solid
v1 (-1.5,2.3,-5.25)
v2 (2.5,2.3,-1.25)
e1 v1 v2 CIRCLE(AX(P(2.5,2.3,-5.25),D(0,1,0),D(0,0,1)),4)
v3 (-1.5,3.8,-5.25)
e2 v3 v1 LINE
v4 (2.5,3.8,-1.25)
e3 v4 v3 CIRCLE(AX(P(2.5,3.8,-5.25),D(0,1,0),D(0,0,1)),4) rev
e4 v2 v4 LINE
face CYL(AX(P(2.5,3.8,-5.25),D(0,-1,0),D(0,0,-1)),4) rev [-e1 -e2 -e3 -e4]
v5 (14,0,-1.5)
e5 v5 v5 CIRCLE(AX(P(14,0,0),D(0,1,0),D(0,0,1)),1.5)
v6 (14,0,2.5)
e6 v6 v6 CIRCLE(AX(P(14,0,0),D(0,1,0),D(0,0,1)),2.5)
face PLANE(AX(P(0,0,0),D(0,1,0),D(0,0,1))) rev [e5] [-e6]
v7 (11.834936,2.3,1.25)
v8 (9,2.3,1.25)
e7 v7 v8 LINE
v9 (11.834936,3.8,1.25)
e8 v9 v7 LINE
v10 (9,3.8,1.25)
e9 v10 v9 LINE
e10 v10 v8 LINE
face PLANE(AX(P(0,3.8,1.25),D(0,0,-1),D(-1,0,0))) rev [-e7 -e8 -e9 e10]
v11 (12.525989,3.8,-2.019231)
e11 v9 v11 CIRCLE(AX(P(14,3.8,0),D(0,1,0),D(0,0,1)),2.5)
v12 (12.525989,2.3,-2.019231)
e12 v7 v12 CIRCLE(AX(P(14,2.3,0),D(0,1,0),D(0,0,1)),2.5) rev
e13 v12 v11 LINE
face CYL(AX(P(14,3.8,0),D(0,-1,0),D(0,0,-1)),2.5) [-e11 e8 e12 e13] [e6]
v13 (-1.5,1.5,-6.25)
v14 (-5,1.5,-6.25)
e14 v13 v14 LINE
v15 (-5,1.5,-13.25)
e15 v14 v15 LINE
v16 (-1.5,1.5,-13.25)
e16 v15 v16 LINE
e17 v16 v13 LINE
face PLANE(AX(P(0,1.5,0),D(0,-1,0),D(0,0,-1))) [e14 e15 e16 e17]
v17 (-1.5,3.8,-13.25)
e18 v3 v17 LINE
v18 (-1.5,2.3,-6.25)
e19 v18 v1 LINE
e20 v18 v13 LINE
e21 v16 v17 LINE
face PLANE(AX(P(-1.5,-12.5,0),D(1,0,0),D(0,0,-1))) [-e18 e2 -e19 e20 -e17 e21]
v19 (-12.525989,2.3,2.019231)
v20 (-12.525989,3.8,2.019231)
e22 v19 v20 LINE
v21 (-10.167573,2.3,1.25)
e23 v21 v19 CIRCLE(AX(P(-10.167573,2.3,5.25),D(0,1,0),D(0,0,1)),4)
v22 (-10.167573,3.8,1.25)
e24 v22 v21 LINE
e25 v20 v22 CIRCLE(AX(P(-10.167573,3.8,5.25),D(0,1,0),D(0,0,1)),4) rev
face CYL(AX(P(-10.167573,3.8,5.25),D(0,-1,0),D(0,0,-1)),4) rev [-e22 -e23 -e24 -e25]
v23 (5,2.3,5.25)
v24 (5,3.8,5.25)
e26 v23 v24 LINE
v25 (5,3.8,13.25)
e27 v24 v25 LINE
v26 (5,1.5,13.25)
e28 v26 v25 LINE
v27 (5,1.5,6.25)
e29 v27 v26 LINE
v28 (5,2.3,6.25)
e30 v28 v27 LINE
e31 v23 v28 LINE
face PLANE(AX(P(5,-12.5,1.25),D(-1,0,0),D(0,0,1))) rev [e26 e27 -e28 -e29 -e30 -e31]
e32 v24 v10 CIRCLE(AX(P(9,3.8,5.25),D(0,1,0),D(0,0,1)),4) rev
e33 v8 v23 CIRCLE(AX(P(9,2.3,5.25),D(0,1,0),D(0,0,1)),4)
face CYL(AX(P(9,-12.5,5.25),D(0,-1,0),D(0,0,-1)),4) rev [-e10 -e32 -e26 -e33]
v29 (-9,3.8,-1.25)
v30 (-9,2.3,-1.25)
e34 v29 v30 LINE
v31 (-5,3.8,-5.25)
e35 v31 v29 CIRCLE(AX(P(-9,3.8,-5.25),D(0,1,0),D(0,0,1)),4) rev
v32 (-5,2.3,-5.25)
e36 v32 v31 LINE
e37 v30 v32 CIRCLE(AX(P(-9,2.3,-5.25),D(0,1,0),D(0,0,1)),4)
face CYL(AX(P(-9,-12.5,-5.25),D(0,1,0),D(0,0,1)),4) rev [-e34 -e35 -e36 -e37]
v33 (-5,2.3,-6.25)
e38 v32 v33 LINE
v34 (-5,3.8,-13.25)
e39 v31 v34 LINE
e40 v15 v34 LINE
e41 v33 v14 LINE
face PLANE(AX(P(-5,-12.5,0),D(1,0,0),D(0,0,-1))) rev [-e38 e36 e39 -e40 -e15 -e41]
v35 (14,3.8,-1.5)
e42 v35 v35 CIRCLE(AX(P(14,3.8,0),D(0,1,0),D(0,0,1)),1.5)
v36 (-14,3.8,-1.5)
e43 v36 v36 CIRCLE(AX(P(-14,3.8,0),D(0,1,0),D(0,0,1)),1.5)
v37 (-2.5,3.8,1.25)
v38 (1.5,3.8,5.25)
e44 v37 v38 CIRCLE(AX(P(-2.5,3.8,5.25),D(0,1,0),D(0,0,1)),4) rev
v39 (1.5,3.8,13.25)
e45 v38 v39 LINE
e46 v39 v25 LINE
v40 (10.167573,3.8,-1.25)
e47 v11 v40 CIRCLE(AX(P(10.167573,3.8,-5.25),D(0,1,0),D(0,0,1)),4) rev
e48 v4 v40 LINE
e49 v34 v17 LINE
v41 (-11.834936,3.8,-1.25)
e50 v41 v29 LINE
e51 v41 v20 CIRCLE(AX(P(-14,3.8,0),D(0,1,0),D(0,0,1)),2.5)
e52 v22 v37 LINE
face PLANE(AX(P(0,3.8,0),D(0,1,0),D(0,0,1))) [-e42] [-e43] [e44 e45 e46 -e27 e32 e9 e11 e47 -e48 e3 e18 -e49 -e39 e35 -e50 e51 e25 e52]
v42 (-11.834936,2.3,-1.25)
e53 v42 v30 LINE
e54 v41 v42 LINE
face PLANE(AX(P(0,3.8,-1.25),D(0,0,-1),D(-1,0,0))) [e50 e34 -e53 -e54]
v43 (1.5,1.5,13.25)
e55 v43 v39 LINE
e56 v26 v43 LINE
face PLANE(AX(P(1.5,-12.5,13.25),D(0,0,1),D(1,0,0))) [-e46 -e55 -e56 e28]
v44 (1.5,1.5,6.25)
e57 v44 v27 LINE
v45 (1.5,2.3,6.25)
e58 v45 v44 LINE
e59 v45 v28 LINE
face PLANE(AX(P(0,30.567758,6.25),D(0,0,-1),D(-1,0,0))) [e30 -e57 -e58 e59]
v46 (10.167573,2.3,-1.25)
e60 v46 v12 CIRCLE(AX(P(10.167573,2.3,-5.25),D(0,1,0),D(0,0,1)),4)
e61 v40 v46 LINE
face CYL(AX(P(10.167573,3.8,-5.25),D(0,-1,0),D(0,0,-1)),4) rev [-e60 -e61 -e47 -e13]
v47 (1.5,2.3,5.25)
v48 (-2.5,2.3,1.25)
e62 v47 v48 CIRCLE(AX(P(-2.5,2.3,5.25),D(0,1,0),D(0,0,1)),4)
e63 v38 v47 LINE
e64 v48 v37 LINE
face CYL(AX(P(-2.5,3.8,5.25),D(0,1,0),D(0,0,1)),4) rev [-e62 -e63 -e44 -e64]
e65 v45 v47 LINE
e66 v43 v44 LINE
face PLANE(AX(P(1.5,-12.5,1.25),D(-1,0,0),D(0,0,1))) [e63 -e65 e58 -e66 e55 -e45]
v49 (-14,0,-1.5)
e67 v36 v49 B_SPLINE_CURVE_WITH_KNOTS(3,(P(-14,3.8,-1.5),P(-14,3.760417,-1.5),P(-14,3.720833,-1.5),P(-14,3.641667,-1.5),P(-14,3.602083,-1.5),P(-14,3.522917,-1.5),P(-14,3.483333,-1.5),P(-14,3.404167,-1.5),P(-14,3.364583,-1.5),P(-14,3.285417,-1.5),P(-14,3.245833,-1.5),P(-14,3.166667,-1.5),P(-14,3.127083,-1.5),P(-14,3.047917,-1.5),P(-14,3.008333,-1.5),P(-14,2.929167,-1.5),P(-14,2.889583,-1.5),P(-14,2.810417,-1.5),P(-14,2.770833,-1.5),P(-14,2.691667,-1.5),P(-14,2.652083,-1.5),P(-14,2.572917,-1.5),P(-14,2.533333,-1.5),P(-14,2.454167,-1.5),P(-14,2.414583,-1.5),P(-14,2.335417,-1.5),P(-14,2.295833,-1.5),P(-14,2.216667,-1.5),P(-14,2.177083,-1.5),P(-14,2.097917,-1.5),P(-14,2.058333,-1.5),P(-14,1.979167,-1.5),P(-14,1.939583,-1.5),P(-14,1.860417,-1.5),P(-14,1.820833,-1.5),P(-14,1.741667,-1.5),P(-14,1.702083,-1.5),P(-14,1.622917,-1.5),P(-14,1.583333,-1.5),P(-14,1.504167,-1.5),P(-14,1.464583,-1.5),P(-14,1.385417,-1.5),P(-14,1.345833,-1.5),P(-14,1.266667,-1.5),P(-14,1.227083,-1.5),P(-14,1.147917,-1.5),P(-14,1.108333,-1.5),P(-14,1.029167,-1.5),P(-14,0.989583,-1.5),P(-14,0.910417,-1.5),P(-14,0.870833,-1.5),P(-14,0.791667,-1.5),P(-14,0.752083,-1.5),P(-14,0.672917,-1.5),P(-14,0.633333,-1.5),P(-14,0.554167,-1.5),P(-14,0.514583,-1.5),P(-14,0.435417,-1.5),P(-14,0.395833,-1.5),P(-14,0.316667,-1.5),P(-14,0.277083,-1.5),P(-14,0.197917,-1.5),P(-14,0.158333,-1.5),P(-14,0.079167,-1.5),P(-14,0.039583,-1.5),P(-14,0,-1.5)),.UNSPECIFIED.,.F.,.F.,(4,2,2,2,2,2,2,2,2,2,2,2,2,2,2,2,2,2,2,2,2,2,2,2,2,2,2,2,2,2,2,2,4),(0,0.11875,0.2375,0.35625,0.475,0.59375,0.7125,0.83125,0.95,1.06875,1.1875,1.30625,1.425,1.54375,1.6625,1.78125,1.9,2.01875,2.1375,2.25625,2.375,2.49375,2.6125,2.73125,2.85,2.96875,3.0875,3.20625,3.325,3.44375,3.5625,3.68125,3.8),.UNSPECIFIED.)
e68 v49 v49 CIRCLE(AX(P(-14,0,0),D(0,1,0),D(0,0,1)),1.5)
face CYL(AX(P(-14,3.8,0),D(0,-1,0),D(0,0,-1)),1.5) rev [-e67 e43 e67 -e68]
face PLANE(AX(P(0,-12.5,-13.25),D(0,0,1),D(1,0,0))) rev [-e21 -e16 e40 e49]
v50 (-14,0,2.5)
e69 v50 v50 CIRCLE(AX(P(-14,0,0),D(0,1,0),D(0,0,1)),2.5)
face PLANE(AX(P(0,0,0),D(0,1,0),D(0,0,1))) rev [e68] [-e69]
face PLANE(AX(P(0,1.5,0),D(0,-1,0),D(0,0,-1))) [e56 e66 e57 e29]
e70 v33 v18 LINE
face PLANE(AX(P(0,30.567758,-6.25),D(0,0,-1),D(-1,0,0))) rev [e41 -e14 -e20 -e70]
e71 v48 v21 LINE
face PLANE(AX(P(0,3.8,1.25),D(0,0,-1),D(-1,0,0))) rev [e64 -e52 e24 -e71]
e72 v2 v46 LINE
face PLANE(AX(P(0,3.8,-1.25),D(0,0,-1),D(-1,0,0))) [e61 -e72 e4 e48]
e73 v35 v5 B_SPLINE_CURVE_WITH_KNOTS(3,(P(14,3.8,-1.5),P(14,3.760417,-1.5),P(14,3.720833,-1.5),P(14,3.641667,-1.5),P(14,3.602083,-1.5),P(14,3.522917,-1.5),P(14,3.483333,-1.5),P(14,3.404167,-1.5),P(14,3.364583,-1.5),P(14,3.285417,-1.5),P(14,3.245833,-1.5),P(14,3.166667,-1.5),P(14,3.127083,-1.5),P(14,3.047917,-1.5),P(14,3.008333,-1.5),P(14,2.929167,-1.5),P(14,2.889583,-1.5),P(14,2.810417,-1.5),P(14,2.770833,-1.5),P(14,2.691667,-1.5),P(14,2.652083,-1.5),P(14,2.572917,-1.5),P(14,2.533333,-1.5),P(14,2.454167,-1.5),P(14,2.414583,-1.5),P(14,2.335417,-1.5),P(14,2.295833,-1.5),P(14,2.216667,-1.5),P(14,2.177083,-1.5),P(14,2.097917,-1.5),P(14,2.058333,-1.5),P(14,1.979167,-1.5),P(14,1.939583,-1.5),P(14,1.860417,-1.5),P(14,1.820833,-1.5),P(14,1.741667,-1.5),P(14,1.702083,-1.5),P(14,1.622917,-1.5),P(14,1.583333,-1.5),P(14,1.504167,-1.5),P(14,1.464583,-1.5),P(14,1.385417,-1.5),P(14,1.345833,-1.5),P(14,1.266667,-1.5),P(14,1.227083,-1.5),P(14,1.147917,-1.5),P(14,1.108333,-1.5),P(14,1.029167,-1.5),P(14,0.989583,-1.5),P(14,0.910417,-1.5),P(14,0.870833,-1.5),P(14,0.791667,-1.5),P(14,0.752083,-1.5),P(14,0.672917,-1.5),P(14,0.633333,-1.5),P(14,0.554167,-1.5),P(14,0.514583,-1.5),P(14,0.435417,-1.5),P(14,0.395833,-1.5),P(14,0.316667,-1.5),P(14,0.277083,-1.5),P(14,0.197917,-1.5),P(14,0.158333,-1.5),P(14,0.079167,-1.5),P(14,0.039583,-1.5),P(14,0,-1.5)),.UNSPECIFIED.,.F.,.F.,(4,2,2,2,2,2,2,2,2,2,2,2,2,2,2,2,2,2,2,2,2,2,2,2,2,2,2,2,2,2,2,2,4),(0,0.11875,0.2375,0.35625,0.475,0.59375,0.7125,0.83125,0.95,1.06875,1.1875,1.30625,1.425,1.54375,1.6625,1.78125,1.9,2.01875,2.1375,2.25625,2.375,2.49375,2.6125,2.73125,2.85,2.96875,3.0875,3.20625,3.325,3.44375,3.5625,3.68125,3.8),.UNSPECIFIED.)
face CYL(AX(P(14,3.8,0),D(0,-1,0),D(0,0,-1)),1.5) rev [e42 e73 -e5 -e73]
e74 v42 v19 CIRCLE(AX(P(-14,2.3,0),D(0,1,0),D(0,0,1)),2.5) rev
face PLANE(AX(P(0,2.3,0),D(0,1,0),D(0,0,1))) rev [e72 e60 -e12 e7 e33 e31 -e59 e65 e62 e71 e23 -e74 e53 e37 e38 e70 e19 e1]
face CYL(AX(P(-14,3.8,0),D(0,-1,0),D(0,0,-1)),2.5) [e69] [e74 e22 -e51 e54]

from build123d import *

# Parameters (mm, degrees)
SKETCH1_R           = 1.5
BOSS_EXTRUDE2_DEPTH = 3.8
SKETCH2_W           = 3.5
SKETCH2_H           = 7
SKETCH2_H_2         = 5
BOSS_EXTRUDE3_DEPTH = 3.8
CUT_EXTRUDE1_DEPTH  = 2.3
SKETCH4_W           = 3.5
SKETCH4_H           = 7
CUT_EXTRUDE2_DEPTH  = 1.5
FILLET1_R           = 4


with BuildPart() as part:
    # Sketch1 → Boss-Extrude2 (new body)
    # profile 1 of 5: a face of its own
    with BuildSketch(Plane(origin=(0, 0, 0), x_dir=(1, 0, 0), z_dir=(0, 1, 0))):
        with BuildLine():
            Line((-11.834936491, -1.25), (-11.834936491, 1.25))
            ThreePointArc((-11.834936491, 1.25), (-16.5, 0), (-11.834936491, -1.25))
        make_face()
        with Locations(Location((-14, 0, 0), (0, 0, 90))):
            Circle(SKETCH1_R, mode=Mode.SUBTRACT)
    # profile 2 of 5: a face of its own
    with BuildSketch(Plane(origin=(0, 0, 0), x_dir=(1, 0, 0), z_dir=(0, 1, 0))):
        with BuildLine():
            ThreePointArc((-11.5, 0), (-11.585185434, 0.647047613), (-11.834936491, 1.25))
            Line((-11.834936491, 1.25), (-11.834936491, -1.25))
            ThreePointArc((-11.834936491, -1.25), (-11.585185434, -0.647047613), (-11.5, 0))
        make_face()
    # profile 3 of 5: a face of its own
    with BuildSketch(Plane(origin=(0, 0, 0), x_dir=(1, 0, 0), z_dir=(0, 1, 0))):
        with BuildLine():
            Line((11.834936491, 1.25), (-11.834936491, 1.25))
            ThreePointArc((-11.834936491, 1.25), (-11.585185434, 0.647047613), (-11.5, 0))
            ThreePointArc((-11.5, 0), (-11.585185434, -0.647047613), (-11.834936491, -1.25))
            Line((-11.834936491, -1.25), (11.834936491, -1.25))
            ThreePointArc((11.834936491, -1.25), (11.5, 0), (11.834936491, 1.25))
        make_face()
    # profile 4 of 5: a face of its own
    with BuildSketch(Plane(origin=(0, 0, 0), x_dir=(1, 0, 0), z_dir=(0, 1, 0))):
        with BuildLine():
            Line((11.834936491, -1.25), (11.834936491, 1.25))
            ThreePointArc((11.834936491, 1.25), (11.5, 0), (11.834936491, -1.25))
        make_face()
    # profile 5 of 5: a face of its own
    with BuildSketch(Plane(origin=(0, 0, 0), x_dir=(1, 0, 0), z_dir=(0, 1, 0))):
        with BuildLine():
            ThreePointArc((16.5, 0), (14.647047613, 2.414814566), (11.834936491, 1.25))
            Line((11.834936491, 1.25), (11.834936491, -1.25))
            ThreePointArc((11.834936491, -1.25), (14.647047613, -2.414814566), (16.5, 0))
        make_face()
        with Locations(Location((14, 0, 0), (0, 0, 90))):
            Circle(SKETCH1_R, mode=Mode.SUBTRACT)
    extrude(amount=BOSS_EXTRUDE2_DEPTH)

    # Sketch2 → Boss-Extrude3 (add)
    with BuildSketch(Plane(origin=(0, 3.8, 0), x_dir=(1, 0, 0), z_dir=(0, 1, 0))):
        with Locations((-3.25, 9.75)):
            Rectangle(SKETCH2_W, SKETCH2_H)
        with Locations((-3.25, 3.75)):
            Rectangle(SKETCH2_W, SKETCH2_H_2)
        with Locations((3.25, -3.75)):
            Rectangle(SKETCH2_W, SKETCH2_H_2)
        with Locations((3.25, -9.75)):
            Rectangle(SKETCH2_W, SKETCH2_H)
    extrude(amount=-BOSS_EXTRUDE3_DEPTH)

    # Sketch3 → Cut-Extrude1 (cut)
    with BuildSketch(Plane.XZ):
        with BuildLine():
            Line((5, 6.25), (1.5, 6.25))
            Line((1.5, 6.25), (1.5, 1.25))
            Line((1.5, 1.25), (-11.834936491, 1.25))
            ThreePointArc((-11.834936491, 1.25), (-11.5, 0), (-11.834936491, -1.25))
            Line((-11.834936491, -1.25), (-5, -1.25))
            Line((-5, -1.25), (-5, -6.25))
            Line((-5, -6.25), (-1.5, -6.25))
            Line((-1.5, -6.25), (-1.5, -1.25))
            Line((-1.5, -1.25), (11.834936491, -1.25))
            ThreePointArc((11.834936491, -1.25), (11.5, 0), (11.834936491, 1.25))
            Line((11.834936491, 1.25), (5, 1.25))
            Line((5, 1.25), (5, 6.25))
        make_face()
    extrude(amount=-CUT_EXTRUDE1_DEPTH, mode=Mode.SUBTRACT)

    # Sketch4 → Cut-Extrude2 (cut)
    with BuildSketch(Plane.XZ):
        with Locations((-3.25, -9.75)):
            Rectangle(SKETCH4_W, SKETCH4_H)
        with Locations((3.25, 9.75)):
            Rectangle(SKETCH4_W, SKETCH4_H)
    extrude(amount=-CUT_EXTRUDE2_DEPTH, mode=Mode.SUBTRACT)

    # Fillet1
    # the kernel refuses this fillet: 4 mm, written as the material it adds along each edge
    with BuildSketch(Plane(origin=(11.834936491, 2.3, -1.25), x_dir=(-1, 0, 0), z_dir=(0, 1, 0))) as fillet1_piece_1:
        with BuildLine():
            CenterArc((1.66736392, -4), FILLET1_R, 90, 36.128927472)
            ThreePointArc((-0.69105296, -0.769230769), (-0.305320518, -0.420735169), (0, 0))
            Line((0, 0), (1.66736392, 0))
        make_face()
    extrude(amount=1.5)
    with BuildSketch(Plane(origin=(-11.834936491, 2.3, 1.25), x_dir=(-0.668294067479168, 0, 0.743897196776644), z_dir=(0, 1, 0))) as fillet1_piece_2:
        with BuildLine():
            CenterArc((1.861299371, 3.913523616), FILLET1_R, 221.935536264, 36.128927472)
            Line((-1.114289416, 1.240347346), (0, 0))
            ThreePointArc((0, 0), (0.517027603, 0.05404774), (1.034055206, 0))
        make_face()
    extrude(amount=1.5)
    with BuildSketch(Plane(origin=(1.5, 3.8, 1.25), x_dir=(-1, 0, 0), z_dir=(0, -1, 0)), Plane(origin=(5, 3.8, 1.25), x_dir=(0, 0, 1), z_dir=(0, -1, 0))) as fillet1_piece_3:
        with BuildLine():
            CenterArc((FILLET1_R, -FILLET1_R), FILLET1_R, 90, 90)
            Line((0, -FILLET1_R), (0, 0))
            Line((0, 0), (FILLET1_R, 0))
        make_face()
    extrude(amount=1.5)
    with BuildSketch(Plane(origin=(-5, 3.8, -1.25), x_dir=(-1, 0, 0), z_dir=(0, -1, 0)), Plane(origin=(-1.5, 3.8, -1.25), x_dir=(0, 0, -1), z_dir=(0, -1, 0))) as fillet1_piece_4:
        with BuildLine():
            CenterArc((FILLET1_R, FILLET1_R), FILLET1_R, 180, 90)
            Line((0, FILLET1_R), (0, 0))
            Line((0, 0), (FILLET1_R, 0))
        make_face()
    extrude(amount=1.5)


solid = part.part
